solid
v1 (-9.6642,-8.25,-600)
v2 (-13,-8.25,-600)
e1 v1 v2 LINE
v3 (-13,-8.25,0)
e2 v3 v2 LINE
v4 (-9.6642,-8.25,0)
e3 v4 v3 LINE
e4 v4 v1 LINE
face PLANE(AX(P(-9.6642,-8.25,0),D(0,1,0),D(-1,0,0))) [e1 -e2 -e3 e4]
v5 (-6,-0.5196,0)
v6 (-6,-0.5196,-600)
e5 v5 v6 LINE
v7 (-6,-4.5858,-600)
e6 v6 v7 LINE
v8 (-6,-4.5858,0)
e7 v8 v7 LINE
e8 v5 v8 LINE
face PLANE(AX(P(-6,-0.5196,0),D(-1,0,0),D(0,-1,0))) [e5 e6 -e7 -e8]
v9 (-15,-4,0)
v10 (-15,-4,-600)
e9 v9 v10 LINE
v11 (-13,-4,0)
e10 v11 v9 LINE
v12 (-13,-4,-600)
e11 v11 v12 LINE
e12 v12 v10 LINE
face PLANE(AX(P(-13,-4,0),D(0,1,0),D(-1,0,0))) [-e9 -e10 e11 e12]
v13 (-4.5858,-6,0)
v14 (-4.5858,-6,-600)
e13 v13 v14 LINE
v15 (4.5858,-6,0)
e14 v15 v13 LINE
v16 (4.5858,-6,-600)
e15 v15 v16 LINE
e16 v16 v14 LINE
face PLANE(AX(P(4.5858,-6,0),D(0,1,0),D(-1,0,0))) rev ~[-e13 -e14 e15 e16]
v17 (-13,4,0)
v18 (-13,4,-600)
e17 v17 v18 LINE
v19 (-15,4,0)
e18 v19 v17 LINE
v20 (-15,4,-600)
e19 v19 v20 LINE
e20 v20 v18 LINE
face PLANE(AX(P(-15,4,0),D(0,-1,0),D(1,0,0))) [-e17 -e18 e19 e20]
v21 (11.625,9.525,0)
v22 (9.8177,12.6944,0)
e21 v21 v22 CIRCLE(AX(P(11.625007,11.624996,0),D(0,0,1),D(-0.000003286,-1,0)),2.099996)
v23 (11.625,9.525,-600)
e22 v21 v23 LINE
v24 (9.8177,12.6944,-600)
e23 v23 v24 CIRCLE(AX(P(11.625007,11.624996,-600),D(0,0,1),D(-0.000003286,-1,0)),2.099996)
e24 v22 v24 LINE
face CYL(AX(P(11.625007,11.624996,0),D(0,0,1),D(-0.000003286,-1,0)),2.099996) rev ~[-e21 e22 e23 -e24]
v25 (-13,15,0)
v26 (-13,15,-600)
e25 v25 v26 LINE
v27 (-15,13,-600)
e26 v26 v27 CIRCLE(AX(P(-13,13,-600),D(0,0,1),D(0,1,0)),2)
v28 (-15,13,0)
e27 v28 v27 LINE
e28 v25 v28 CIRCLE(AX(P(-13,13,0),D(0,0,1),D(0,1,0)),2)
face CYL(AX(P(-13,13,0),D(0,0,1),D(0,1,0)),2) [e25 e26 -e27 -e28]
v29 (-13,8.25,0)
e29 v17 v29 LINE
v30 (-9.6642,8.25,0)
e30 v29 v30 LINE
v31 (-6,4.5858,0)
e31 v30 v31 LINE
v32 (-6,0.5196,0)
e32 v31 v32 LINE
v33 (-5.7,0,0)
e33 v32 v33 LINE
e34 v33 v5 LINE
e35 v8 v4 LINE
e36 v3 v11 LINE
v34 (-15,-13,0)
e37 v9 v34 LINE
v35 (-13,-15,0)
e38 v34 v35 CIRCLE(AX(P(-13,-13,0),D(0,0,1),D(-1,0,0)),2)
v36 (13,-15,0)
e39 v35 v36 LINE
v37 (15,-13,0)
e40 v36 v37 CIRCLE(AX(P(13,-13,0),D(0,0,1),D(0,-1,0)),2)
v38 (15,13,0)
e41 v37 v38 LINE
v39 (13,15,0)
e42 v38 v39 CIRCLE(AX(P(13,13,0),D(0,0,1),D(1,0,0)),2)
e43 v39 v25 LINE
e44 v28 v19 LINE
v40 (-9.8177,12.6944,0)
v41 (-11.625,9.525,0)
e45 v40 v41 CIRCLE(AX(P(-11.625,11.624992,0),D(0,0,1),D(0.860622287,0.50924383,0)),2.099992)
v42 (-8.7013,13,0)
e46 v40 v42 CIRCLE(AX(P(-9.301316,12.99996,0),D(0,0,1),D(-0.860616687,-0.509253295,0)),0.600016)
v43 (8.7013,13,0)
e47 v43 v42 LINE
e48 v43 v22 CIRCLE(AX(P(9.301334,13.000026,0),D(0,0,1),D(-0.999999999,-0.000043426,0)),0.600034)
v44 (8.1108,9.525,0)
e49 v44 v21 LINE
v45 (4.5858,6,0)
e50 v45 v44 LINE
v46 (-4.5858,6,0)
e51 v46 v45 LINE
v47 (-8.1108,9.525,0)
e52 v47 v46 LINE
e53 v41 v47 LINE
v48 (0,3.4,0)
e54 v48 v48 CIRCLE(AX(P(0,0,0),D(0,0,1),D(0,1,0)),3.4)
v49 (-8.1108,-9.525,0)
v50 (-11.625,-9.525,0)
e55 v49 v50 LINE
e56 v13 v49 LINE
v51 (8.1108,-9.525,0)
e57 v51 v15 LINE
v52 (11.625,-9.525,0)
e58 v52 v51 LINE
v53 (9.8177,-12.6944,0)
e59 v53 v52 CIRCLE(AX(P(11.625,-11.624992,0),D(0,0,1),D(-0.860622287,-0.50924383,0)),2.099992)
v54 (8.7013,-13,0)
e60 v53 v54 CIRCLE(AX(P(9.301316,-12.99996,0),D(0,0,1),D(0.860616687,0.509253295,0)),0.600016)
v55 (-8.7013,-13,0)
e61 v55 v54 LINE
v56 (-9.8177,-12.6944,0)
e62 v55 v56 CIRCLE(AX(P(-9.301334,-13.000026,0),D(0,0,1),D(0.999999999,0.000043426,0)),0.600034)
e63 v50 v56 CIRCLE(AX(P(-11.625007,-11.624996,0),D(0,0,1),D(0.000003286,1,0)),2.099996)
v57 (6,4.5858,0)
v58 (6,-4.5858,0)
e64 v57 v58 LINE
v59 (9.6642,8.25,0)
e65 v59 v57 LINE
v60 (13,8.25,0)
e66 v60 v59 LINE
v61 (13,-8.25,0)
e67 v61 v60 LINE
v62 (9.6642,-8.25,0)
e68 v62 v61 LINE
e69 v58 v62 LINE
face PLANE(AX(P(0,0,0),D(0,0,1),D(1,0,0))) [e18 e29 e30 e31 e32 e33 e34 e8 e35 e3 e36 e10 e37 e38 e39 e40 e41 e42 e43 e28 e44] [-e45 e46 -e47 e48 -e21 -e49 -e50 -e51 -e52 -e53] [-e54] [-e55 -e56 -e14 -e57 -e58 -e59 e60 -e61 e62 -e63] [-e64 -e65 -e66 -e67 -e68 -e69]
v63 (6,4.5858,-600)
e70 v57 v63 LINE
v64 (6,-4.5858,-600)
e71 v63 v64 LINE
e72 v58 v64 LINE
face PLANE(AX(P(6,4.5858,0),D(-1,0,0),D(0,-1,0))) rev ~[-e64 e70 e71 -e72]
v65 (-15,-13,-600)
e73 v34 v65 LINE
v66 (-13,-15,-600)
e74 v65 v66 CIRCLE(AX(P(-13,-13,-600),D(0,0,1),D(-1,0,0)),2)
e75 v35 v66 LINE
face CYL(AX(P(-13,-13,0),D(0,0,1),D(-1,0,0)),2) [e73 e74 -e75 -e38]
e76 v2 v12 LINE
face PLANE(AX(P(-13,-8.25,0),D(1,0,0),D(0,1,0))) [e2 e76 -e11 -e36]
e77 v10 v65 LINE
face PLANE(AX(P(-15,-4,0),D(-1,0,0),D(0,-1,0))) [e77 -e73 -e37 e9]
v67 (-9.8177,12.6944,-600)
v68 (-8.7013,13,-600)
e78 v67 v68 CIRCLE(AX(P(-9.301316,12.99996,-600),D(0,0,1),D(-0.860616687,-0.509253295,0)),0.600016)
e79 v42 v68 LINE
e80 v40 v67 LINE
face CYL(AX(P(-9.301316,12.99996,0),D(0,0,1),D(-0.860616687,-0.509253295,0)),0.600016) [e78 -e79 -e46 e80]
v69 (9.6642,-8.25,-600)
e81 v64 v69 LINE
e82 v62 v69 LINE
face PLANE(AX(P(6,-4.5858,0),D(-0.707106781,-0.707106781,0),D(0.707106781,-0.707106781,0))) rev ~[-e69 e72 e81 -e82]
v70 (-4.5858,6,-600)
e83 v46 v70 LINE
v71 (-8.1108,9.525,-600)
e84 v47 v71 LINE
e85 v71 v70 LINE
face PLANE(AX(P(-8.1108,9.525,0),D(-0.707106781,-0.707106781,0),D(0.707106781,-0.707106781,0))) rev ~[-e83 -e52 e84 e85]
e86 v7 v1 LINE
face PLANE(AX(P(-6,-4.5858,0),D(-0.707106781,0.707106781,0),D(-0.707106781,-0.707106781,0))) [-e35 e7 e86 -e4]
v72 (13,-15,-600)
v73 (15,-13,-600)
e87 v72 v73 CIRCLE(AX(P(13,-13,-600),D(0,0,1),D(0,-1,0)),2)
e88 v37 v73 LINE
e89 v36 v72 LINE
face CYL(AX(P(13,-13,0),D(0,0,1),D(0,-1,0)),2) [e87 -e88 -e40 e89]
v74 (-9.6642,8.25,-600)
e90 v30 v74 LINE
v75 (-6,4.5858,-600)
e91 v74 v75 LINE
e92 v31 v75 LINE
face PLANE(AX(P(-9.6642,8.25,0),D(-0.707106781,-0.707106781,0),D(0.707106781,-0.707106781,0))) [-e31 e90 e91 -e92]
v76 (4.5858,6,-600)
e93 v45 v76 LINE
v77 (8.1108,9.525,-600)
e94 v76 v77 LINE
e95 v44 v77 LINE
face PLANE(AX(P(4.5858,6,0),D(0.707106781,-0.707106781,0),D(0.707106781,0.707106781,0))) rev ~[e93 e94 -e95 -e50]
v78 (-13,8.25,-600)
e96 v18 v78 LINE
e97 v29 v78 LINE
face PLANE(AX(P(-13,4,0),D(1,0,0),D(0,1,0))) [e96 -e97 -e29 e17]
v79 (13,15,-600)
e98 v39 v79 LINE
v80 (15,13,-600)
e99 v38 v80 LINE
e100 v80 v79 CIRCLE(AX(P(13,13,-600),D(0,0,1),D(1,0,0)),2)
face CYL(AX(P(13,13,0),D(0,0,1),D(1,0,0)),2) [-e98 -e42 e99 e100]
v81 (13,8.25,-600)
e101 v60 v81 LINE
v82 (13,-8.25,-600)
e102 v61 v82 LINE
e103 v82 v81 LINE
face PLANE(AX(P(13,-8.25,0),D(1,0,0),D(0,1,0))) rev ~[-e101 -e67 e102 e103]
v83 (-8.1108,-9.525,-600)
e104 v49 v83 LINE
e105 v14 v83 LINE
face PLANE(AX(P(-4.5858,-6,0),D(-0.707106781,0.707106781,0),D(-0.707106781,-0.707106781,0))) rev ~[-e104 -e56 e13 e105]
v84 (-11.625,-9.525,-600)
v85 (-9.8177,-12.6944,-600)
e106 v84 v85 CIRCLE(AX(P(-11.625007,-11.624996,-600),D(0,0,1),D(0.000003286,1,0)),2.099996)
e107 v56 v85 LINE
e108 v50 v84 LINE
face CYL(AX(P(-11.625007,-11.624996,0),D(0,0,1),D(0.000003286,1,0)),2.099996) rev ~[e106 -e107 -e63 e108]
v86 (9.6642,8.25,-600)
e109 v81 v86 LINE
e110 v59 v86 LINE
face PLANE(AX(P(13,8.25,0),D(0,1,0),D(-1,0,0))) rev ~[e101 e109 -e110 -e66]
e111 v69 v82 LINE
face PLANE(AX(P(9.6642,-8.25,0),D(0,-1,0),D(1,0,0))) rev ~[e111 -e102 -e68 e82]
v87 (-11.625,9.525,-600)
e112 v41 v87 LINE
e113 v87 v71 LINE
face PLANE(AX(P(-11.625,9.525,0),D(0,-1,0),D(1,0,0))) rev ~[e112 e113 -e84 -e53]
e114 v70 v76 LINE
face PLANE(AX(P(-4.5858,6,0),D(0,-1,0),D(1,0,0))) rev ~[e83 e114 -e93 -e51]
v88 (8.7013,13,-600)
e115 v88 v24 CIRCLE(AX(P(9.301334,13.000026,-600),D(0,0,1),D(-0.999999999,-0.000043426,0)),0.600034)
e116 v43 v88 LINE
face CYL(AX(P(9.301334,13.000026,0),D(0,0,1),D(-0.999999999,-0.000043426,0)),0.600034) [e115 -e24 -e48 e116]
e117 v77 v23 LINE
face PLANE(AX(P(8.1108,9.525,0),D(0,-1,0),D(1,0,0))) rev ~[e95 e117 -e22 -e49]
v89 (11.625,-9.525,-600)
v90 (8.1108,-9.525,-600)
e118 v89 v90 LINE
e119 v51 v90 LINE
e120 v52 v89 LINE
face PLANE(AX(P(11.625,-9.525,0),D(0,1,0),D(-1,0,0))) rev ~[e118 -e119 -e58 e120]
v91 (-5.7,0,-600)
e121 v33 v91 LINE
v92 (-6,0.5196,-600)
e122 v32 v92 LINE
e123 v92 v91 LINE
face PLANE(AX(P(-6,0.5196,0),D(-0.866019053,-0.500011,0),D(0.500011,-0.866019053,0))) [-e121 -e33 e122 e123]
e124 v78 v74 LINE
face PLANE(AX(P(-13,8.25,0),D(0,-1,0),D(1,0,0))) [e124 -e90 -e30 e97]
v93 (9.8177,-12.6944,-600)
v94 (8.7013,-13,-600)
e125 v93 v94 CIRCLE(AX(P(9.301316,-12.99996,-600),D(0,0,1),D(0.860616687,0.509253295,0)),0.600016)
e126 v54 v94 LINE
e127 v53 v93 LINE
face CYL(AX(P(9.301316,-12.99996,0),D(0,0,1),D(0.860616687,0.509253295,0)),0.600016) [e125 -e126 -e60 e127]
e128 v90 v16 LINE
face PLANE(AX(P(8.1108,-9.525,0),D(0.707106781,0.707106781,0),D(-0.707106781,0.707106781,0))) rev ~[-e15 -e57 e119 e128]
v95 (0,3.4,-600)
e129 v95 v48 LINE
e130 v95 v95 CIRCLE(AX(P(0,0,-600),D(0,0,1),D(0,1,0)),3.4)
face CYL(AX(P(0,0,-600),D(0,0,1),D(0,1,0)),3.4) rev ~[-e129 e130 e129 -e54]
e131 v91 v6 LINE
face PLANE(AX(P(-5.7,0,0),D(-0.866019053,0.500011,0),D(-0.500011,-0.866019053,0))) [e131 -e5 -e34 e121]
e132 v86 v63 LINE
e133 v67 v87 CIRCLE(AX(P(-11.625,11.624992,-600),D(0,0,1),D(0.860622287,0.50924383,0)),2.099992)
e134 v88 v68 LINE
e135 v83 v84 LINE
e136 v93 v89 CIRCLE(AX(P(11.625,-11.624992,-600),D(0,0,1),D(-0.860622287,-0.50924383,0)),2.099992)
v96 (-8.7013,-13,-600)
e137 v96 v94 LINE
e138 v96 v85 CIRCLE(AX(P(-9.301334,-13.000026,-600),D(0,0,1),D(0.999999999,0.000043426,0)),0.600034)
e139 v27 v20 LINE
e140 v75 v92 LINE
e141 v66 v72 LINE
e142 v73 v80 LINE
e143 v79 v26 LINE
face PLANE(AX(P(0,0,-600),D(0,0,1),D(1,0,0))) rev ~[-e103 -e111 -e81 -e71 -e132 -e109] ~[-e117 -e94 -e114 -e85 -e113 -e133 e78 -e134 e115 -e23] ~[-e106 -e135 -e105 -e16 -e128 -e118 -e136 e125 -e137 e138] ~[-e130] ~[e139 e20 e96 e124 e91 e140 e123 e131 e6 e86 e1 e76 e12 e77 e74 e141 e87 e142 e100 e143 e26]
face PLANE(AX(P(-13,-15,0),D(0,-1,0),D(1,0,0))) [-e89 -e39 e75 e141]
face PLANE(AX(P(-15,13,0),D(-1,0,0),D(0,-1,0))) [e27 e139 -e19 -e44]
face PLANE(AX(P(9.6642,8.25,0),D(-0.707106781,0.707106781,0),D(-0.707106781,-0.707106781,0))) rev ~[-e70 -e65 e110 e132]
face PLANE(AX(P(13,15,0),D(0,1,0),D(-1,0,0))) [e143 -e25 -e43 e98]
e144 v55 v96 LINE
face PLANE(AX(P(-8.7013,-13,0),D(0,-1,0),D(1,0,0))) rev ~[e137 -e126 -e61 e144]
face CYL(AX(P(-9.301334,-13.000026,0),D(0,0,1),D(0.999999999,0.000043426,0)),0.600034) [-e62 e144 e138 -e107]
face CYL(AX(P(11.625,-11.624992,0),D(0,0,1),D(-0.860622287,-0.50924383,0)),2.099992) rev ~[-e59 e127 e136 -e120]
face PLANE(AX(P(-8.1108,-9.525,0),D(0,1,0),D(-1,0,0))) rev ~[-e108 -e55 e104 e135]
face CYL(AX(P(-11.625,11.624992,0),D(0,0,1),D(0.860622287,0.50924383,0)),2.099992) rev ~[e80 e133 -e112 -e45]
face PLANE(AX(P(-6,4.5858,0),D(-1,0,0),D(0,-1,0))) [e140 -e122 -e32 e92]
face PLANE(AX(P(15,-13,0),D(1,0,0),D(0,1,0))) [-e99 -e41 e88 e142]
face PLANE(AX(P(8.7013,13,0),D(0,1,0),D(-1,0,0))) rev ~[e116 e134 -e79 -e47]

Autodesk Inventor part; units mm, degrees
sketch "Sketch_122" plane through (0, 0, 0) normal (0, 0, 1) x (1, 0, 0)
  arc A0 (-15, -13) -> (-13, -15) centre (-13, -13) ccw
  line L0 (-13, -15) -> (13, -15)
  arc A1 (13, -15) -> (15, -13) centre (13, -13) ccw
  line L1 (15, -13) -> (15, 13)
  arc A2 (15, 13) -> (13, 15) centre (13, 13) ccw
  line L2 (13, 15) -> (-13, 15)
  arc A3 (-13, 15) -> (-15, 13) centre (-13, 13) ccw
  line L3 (-15, 13) -> (-15, 4)
  line L4 (-15, 4) -> (-13, 4)
  line L5 (-13, 4) -> (-13, 8.25)
  line L6 (-13, 8.25) -> (-9.6642, 8.25)
  line L7 (-9.6642, 8.25) -> (-6, 4.5858)
  line L8 (-6, 4.5858) -> (-6, 0.5196)
  line L9 (-6, 0.5196) -> (-5.7, 0)
  line L10 (-5.7, 0) -> (-6, -0.5196)
  line L11 (-6, -0.5196) -> (-6, -4.5858)
  line L12 (-6, -4.5858) -> (-9.6642, -8.25)
  line L13 (-9.6642, -8.25) -> (-13, -8.25)
  line L14 (-13, -8.25) -> (-13, -4)
  line L15 (-13, -4) -> (-15, -4)
  line L16 (-15, -4) -> (-15, -13)
  line L17 (6, -4.5858) -> (9.6642, -8.25)
  line L18 (9.6642, -8.25) -> (13, -8.25)
  line L19 (13, -8.25) -> (13, 8.25)
  line L20 (13, 8.25) -> (9.6642, 8.25)
  line L21 (9.6642, 8.25) -> (6, 4.5858)
  line L22 (6, 4.5858) -> (6, -4.5858)
extrude "Extrusion1" add sketch "Sketch_122" against normal blind 600
sketch "Sketch2" plane through (0, 0, -600) normal (0, 0, -1) x (-1, 0, 0)
  point P0 (0, 0)
hole "Hole1" at (0, 0, -600) direction (0, 0, 1) diameter 6.8 depth 600
sketch "Sketch_173" plane through (0, 0, 0) normal (0, 0, 1) x (1, 0, 0)
  arc A0 (-9.8177, 12.6944) -> (-11.625, 9.525) centre (-11.625, 11.625) ccw
  line L0 (-11.625, 9.525) -> (-8.1108, 9.525)
  line L1 (-8.1108, 9.525) -> (-4.5858, 6)
  line L2 (-4.5858, 6) -> (4.5858, 6)
  line L3 (4.5858, 6) -> (8.1108, 9.525)
  line L4 (8.1108, 9.525) -> (11.625, 9.525)
  arc A1 (11.625, 9.525) -> (9.8177, 12.6944) centre (11.625, 11.625) ccw
  arc A2 (8.7013, 13) -> (9.8177, 12.6944) centre (9.3013, 13) ccw
  line L5 (8.7013, 13) -> (-8.7013, 13)
  arc A3 (-9.8177, 12.6944) -> (-8.7013, 13) centre (-9.3013, 13) ccw
extrude "Extrusion2" cut sketch "Sketch_173" against normal blind 600
sketch "Sketch_174" plane through (0, 0, 0) normal (0, 0, 1) x (1, 0, 0)
  arc A0 (-11.625, -9.525) -> (-9.8177, -12.6944) centre (-11.625, -11.625) ccw
  arc A1 (-8.7013, -13) -> (-9.8177, -12.6944) centre (-9.3013, -13) ccw
  line L0 (-8.7013, -13) -> (8.7013, -13)
  arc A2 (9.8177, -12.6944) -> (8.7013, -13) centre (9.3013, -13) ccw
  arc A3 (9.8177, -12.6944) -> (11.625, -9.525) centre (11.625, -11.625) ccw
  line L1 (11.625, -9.525) -> (8.1108, -9.525)
  line L2 (8.1108, -9.525) -> (4.5858, -6)
  line L3 (4.5858, -6) -> (-4.5858, -6)
  line L4 (-4.5858, -6) -> (-8.1108, -9.525)
  line L5 (-8.1108, -9.525) -> (-11.625, -9.525)
extrude "Extrusion3" cut sketch "Sketch_174" against normal blind 600
ref_plane "C1_XY" through (0, 0, 0) normal (0, 0, 1) x (1, 0, 0)
ref_plane "C1_YZ" through (0, 0, 0) normal (1, 0, 0) x (0, 1, 0)
ref_plane "C1_ZX" through (0, 0, 0) normal (0, 1, 0) x (0, 0, 1)
ref_plane "to_frame_cap1_XY" through (0, 0, 0) normal (0, 0, 1) x (1, 0, 0)
ref_plane "to_frame_cap1_YZ" through (0, 0, 0) normal (1, 0, 0) x (0, 1, 0)
ref_plane "to_frame_cap1_ZX" through (0, 0, 0) normal (0, 1, 0) x (0, 0, 1)
ref_plane "to_frame_cap2_XY" through (0, 0, -600) normal (0, 0, -1) x (1, 0, 0)
ref_plane "to_frame_cap2_YZ" through (0, 0, -600) normal (1, 0, 0) x (0, -1, 0)
ref_plane "to_frame_cap2_ZX" through (0, 0, -600) normal (0, -1, 0) x (0, 0, -1)
thread "Thread1" size "M8x1.25" class "6H" standard "ANSI Metric M Profile" length 10
thread "Thread2" size "M7x1" class "6H" standard "ANSI Metric M Profile" length 10
properties part number "HFSC6-3030-600" material "Aluminum 6061"
